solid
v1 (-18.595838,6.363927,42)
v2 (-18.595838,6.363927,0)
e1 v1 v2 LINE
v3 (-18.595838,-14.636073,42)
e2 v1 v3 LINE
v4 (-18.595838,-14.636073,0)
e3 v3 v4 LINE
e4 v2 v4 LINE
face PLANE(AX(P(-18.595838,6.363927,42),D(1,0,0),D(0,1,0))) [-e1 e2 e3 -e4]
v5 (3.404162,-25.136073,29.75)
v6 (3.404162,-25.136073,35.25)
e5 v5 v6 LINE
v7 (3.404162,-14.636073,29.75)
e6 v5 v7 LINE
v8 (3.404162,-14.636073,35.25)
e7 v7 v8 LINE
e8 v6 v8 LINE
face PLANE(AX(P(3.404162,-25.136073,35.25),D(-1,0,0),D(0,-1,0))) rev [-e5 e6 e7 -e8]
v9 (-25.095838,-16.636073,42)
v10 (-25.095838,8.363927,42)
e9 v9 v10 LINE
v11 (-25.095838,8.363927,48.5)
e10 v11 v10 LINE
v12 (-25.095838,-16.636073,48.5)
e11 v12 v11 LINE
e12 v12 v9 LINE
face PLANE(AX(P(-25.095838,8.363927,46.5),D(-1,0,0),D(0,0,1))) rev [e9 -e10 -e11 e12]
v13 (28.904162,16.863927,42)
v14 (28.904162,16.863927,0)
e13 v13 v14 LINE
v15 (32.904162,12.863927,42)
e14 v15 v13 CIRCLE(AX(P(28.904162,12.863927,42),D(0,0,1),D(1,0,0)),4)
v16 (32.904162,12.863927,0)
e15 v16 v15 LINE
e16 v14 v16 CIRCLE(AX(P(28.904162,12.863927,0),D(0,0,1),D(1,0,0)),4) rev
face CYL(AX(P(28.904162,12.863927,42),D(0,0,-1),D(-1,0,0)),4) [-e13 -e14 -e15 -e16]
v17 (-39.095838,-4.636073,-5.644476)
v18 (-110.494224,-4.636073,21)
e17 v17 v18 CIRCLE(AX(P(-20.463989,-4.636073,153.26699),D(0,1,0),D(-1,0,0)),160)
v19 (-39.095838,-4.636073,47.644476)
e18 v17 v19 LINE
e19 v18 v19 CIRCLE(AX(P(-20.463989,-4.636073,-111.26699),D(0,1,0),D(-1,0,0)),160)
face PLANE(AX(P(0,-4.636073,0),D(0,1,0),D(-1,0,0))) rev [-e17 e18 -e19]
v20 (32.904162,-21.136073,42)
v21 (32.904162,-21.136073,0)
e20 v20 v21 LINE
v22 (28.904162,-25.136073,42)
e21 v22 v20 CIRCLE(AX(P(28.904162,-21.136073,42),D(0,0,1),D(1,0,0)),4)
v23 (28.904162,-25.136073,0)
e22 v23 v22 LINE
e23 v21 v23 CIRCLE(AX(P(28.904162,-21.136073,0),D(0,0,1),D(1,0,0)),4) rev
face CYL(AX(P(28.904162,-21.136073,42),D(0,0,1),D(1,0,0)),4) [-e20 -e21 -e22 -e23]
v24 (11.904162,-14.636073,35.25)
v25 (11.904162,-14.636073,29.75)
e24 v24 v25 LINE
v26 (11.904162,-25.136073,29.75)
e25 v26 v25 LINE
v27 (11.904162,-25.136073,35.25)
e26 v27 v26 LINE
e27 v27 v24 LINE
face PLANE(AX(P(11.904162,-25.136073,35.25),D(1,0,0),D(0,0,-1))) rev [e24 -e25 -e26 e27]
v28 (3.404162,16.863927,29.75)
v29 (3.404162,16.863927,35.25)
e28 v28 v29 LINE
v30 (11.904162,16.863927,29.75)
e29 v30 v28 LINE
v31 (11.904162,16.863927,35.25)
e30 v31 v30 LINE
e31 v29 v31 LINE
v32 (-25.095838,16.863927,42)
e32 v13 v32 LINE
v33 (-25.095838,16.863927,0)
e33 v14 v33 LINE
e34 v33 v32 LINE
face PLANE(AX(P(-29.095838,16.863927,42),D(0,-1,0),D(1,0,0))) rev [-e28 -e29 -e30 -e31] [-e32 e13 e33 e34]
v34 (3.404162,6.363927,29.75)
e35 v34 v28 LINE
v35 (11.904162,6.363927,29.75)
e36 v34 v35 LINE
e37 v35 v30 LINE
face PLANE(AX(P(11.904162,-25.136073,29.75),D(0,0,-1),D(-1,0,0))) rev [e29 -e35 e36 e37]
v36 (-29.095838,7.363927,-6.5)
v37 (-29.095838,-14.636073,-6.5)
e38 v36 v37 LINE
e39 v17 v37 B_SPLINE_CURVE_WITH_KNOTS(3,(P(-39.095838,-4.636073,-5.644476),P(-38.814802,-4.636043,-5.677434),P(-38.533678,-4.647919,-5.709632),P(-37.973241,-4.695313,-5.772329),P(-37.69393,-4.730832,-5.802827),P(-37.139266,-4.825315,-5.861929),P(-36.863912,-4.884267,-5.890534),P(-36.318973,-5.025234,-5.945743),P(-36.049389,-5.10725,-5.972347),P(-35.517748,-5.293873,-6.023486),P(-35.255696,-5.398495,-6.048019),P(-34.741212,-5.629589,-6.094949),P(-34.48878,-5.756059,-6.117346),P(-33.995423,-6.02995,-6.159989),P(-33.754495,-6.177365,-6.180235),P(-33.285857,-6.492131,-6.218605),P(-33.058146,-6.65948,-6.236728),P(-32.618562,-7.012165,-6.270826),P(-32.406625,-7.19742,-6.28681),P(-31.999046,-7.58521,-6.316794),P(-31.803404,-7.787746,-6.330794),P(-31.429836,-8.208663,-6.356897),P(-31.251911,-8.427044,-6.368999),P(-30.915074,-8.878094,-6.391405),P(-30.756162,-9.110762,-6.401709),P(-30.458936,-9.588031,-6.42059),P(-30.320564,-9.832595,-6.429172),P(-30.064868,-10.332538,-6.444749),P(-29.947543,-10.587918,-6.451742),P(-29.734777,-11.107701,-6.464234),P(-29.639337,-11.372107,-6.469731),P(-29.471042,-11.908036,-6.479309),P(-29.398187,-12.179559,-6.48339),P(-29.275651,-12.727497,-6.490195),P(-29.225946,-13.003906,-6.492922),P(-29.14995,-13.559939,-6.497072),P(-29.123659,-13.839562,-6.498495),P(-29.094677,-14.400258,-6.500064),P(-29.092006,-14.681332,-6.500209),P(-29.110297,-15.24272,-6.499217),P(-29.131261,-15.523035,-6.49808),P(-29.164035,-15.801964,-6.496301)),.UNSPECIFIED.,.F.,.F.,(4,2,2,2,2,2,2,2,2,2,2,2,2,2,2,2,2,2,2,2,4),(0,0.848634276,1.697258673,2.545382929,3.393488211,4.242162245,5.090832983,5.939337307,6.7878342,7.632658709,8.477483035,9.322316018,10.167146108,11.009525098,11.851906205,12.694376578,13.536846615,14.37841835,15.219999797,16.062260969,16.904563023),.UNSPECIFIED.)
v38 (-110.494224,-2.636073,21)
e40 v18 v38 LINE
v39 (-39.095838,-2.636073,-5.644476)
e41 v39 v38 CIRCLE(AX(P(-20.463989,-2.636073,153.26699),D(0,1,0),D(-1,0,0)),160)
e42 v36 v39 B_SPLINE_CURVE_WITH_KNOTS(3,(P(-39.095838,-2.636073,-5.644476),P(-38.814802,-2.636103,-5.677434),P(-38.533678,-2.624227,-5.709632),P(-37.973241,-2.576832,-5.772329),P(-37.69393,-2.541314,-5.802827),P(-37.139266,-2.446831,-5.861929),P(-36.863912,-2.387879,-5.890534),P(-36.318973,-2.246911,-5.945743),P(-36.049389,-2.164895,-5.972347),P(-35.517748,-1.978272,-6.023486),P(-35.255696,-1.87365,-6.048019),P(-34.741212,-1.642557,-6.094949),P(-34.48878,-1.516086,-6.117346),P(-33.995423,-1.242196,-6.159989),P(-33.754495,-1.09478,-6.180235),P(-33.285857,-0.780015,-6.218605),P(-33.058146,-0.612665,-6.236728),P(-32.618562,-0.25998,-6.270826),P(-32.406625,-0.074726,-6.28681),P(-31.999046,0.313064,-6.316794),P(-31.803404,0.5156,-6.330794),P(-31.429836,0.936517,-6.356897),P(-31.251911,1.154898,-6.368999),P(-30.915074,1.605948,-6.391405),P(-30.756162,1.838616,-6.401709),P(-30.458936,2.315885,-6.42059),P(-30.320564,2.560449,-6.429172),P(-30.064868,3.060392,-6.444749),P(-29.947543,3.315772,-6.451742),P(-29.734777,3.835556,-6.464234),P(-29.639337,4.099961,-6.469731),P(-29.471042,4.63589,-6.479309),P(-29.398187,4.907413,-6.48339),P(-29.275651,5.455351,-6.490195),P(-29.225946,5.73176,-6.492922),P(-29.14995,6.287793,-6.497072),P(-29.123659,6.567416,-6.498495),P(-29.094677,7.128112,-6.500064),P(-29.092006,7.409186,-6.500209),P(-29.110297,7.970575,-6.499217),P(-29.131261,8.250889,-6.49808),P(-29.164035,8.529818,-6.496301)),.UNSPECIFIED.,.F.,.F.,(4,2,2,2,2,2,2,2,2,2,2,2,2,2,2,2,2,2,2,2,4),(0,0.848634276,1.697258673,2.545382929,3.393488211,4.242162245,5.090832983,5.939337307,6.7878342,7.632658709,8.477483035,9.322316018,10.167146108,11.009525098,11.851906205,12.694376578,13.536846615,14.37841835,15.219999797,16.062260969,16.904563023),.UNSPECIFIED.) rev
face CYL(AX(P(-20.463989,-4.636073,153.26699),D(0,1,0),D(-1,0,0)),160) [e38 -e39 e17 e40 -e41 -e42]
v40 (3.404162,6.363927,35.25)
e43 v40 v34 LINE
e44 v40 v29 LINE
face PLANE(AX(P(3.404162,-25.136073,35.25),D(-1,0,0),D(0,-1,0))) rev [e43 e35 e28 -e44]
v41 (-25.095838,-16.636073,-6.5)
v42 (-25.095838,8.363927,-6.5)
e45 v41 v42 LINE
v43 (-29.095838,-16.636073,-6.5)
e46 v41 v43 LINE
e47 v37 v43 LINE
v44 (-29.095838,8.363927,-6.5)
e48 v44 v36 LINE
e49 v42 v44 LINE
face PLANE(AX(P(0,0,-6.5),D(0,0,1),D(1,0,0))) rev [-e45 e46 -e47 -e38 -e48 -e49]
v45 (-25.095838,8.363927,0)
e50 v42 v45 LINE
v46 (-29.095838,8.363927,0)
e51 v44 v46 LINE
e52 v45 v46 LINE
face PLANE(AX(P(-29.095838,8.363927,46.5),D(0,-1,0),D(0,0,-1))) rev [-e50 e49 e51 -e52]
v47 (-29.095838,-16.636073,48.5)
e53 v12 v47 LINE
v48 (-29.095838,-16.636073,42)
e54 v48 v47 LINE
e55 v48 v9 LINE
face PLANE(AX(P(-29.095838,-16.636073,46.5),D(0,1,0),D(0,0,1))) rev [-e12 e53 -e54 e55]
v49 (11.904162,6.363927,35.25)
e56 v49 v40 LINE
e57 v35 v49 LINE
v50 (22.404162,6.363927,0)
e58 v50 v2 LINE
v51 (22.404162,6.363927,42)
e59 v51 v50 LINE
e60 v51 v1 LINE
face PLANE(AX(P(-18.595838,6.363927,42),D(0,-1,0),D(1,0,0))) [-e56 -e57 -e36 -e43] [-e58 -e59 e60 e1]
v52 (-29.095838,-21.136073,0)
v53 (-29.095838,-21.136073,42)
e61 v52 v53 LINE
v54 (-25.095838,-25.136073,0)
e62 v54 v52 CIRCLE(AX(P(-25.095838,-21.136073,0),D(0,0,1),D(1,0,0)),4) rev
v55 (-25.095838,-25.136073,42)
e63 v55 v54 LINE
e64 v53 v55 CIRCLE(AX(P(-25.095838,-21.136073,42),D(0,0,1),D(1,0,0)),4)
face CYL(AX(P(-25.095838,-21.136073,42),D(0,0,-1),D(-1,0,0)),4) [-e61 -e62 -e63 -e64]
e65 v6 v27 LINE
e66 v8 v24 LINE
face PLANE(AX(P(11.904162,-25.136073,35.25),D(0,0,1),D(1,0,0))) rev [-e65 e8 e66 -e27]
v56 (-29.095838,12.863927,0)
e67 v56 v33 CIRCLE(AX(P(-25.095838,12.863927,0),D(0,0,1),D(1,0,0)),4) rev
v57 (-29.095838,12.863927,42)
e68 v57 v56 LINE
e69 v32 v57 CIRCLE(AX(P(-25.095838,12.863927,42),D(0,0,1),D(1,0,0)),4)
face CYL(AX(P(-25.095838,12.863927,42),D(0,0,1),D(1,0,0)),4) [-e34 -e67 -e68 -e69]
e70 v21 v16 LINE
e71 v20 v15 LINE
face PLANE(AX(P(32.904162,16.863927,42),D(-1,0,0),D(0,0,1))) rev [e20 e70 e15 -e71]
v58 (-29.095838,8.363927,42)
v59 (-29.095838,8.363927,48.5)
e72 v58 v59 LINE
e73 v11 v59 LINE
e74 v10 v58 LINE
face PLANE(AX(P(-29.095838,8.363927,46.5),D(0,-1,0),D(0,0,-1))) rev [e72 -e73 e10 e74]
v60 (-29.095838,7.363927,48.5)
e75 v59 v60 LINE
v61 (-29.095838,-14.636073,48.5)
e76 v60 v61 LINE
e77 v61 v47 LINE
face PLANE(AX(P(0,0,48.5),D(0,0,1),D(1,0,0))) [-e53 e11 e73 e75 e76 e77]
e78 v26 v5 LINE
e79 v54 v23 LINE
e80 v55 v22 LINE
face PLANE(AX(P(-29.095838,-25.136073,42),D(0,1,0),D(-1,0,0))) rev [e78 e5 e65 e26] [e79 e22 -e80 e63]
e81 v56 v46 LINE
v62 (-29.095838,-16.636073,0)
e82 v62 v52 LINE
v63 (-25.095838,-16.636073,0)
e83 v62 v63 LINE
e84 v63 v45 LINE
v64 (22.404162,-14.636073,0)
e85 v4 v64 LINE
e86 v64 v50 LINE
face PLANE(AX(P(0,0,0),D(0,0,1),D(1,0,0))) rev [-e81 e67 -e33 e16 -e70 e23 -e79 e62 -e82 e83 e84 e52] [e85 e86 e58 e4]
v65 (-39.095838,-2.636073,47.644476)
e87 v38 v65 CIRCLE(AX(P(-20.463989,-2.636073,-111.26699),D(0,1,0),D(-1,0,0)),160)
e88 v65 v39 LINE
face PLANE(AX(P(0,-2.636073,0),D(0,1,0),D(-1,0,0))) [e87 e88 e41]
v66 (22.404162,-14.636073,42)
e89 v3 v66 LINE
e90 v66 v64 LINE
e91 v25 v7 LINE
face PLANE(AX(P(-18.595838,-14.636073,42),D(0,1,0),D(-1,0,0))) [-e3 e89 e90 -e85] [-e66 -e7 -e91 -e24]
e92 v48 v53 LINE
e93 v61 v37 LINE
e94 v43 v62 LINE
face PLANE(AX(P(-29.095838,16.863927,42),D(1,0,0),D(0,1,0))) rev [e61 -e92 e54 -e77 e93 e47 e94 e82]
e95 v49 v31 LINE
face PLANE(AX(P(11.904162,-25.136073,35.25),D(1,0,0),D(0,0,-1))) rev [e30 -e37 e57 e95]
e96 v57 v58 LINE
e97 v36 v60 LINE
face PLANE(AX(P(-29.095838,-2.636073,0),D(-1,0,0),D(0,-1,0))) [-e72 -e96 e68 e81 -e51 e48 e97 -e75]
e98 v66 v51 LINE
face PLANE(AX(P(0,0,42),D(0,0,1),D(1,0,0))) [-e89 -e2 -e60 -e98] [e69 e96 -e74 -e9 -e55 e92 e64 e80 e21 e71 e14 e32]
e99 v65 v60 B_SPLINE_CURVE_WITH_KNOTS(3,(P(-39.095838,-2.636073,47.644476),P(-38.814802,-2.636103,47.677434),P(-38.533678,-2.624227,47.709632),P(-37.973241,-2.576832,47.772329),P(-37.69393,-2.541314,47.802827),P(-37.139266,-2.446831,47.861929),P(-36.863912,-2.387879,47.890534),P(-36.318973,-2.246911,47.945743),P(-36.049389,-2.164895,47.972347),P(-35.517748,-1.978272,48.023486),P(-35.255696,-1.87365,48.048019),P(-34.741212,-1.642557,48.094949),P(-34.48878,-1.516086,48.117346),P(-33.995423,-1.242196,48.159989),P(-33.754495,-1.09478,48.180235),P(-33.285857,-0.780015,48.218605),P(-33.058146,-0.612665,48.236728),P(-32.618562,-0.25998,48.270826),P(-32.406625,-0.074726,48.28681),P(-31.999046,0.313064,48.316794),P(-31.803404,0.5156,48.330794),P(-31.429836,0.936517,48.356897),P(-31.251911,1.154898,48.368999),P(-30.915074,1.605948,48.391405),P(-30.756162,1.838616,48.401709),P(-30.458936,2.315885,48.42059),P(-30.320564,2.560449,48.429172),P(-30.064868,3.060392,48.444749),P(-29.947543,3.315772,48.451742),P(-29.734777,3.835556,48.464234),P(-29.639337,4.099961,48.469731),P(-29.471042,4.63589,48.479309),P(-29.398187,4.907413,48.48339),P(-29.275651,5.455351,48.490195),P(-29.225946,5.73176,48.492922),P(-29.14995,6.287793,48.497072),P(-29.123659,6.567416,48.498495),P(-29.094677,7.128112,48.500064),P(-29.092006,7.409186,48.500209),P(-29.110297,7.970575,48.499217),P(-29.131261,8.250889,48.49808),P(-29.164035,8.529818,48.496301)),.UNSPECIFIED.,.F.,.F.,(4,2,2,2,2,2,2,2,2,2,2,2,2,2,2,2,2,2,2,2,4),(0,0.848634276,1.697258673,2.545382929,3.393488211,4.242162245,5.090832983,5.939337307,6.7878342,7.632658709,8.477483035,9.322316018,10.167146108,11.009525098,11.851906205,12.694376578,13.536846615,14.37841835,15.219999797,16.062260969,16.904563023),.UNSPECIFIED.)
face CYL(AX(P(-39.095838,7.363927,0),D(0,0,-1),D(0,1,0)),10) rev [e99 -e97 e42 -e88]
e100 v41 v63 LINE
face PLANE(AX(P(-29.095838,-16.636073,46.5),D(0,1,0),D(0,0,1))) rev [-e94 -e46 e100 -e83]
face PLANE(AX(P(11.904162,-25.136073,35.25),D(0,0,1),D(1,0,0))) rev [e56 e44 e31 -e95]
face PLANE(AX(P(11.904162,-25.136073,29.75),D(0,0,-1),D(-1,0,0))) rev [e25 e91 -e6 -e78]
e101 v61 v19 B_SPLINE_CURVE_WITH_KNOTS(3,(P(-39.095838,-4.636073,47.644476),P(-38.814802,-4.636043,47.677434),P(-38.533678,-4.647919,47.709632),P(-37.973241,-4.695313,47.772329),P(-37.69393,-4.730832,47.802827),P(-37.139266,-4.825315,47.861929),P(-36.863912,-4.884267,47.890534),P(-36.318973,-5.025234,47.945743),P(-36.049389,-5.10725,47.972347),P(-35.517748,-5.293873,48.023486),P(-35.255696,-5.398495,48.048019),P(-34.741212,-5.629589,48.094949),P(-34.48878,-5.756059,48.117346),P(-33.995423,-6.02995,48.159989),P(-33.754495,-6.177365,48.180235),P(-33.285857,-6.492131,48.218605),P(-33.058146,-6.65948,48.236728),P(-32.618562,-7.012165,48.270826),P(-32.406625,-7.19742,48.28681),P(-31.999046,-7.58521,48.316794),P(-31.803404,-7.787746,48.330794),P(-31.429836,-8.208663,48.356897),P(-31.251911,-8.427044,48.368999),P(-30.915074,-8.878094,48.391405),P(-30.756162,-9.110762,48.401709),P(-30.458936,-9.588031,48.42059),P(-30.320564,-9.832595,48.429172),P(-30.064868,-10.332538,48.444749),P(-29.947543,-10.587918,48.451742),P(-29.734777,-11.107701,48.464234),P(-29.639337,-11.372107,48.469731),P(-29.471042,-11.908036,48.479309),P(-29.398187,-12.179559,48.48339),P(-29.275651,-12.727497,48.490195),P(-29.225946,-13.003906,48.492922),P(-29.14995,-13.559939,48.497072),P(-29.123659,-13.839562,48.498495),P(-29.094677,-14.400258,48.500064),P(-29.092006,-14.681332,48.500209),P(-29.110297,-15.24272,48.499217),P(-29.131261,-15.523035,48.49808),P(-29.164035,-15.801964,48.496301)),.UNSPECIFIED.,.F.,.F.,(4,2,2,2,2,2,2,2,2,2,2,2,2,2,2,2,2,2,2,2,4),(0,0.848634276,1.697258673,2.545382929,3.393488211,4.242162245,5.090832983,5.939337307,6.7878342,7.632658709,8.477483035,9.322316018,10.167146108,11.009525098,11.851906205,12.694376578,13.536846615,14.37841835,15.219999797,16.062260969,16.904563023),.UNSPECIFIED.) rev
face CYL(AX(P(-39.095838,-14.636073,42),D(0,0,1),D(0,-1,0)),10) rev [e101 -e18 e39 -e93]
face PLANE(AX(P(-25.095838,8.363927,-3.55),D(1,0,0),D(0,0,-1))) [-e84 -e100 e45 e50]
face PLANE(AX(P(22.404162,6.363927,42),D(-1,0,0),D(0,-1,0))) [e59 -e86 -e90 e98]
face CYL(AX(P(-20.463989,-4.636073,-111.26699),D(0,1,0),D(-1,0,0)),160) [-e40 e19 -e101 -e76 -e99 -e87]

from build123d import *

# Parameters (mm, degrees)
SKETCH1_W           = 62
SKETCH1_H           = 42
SKETCH1_W_2         = 41
SKETCH1_H_2         = 21
BOSS_EXTRUDE1_DEPTH = 42
SKETCH2_W           = 4
SKETCH2_H           = 25
BOSS_EXTRUDE2_DEPTH = 4.5
SKETCH2_2_W         = 4
SKETCH2_2_H         = 25
BOSS_EXTRUDE3_DEPTH = 45.55
SKETCH3_W           = 4
SKETCH3_H           = 25
BOSS_EXTRUDE6_DEPTH = 2
BOSS_EXTRUDE7_START = -53
SKETCH3_8_W         = 4
SKETCH3_8_H         = 25
BOSS_EXTRUDE7_DEPTH = 53
CUT_EXTRUDE1_START  = -51
CUT_EXTRUDE1_DEPTH  = 51
SKETCH_1_W          = 8.5
SKETCH_1_H          = 5.5
CUT_EXTRUDE_1_DEPTH = 42
FILLET_3_R          = 4
FILLET_4_R          = 4
FILLET_5_R          = 4
FILLET_6_R          = 4
CUT_EXTRUDE3_DEPTH  = 55
BOSS_EXTRUDE8_DEPTH = 21.5
CUT_EXTRUDE4_DEPTH  = 19.5
FILLET_START        = -14.636072995
FILLET_7_DEPTH      = 10.0000001
FILLET_START_2      = -8
FILLET_7_2_DEPTH    = 57
FILLET_8_R          = 10


with BuildPart() as part:
    # Sketch1 → Boss-Extrude1 (new body)
    with BuildSketch(Plane.XY):
        with Locations((1.904162196, -4.136072895)):
            Rectangle(SKETCH1_W, SKETCH1_H)
        with Locations((1.904162196, -4.136072895)):
            Rectangle(SKETCH1_W_2, SKETCH1_H_2, mode=Mode.SUBTRACT)
    extrude(amount=BOSS_EXTRUDE1_DEPTH)

    # Sketch2 → Boss-Extrude2 (add)
    with BuildSketch(Plane.XY.offset(42)):
        with Locations((-27.095837804, -4.136072895)):
            Rectangle(SKETCH2_W, SKETCH2_H)
    extrude(amount=BOSS_EXTRUDE2_DEPTH)

    # Sketch2<2> → Boss-Extrude3 (add)
    with BuildSketch(Plane.XY.offset(42)):
        with Locations((-27.095837804, -4.136072895)):
            Rectangle(SKETCH2_2_W, SKETCH2_2_H)
    extrude(amount=-BOSS_EXTRUDE3_DEPTH)

    # Sketch3 → Boss-Extrude6 (add)
    # profile 1 of 3: a face of its own
    with BuildSketch(Plane.XY.offset(46.5)):
        with BuildLine():
            Line((-60.095837804, 4.463927105), (-60.095837804, 8.363927105))
            ThreePointArc((-60.095837804, 8.363927105), (-72.595837804, -4.136072895), (-60.095837804, -16.636072895))
            Line((-60.095837804, -16.636072895), (-60.095837804, -13.176248856))
            Line((-60.095837804, -13.176248856), (-60.555926168, -13.176248856))
            ThreePointArc((-60.555926168, -13.176248856), (-62.055926168, -11.676248856), (-60.555926168, -10.176248856))
            Line((-60.555926168, -10.176248856), (-60.095837804, -10.176248856))
            Line((-60.095837804, -10.176248856), (-60.095837804, -8.186072895))
            ThreePointArc((-60.095837804, -8.186072895), (-64.145837804, -4.136072895), (-60.095837804, -0.086072895))
            Line((-60.095837804, -0.086072895), (-60.095837804, 1.463927105))
            Line((-60.095837804, 1.463927105), (-60.595837804, 1.463927105))
            ThreePointArc((-60.595837804, 1.463927105), (-62.095837804, 2.963927105), (-60.595837804, 4.463927105))
            Line((-60.595837804, 4.463927105), (-60.095837804, 4.463927105))
        make_face()
        with BuildLine():
            ThreePointArc((-68.695837804, -3.636072895), (-67.195837804, -2.136072895), (-65.695837804, -3.636072895))
            Line((-65.695837804, -3.636072895), (-65.695837804, -4.636072895))
            ThreePointArc((-65.695837804, -4.636072895), (-67.195837804, -6.136072895), (-68.695837804, -4.636072895))
            Line((-68.695837804, -4.636072895), (-68.695837804, -3.636072895))
        make_face(mode=Mode.SUBTRACT)
    # profile 2 of 3: a face of its own
    with BuildSketch(Plane.XY.offset(46.5)):
        with BuildLine():
            Line((-29.095837804, -16.636072895), (-29.095837804, 8.363927105))
            Line((-29.095837804, 8.363927105), (-60.095837804, 8.363927105))
            Line((-60.095837804, 8.363927105), (-60.095837804, 4.463927105))
            Line((-60.095837804, 4.463927105), (-59.595837804, 4.463927105))
            ThreePointArc((-59.595837804, 4.463927105), (-58.095837804, 2.963927105), (-59.595837804, 1.463927105))
            Line((-59.595837804, 1.463927105), (-60.095837804, 1.463927105))
            Line((-60.095837804, 1.463927105), (-60.095837804, -0.086072895))
            ThreePointArc((-60.095837804, -0.086072895), (-57.23205534, -1.272290432), (-56.045837804, -4.136072895))
            ThreePointArc((-56.045837804, -4.136072895), (-57.23205534, -6.999855359), (-60.095837804, -8.186072895))
            Line((-60.095837804, -8.186072895), (-60.095837804, -10.176248856))
            Line((-60.095837804, -10.176248856), (-59.635749439, -10.176248856))
            ThreePointArc((-59.635749439, -10.176248856), (-58.135749439, -11.676248856), (-59.635749439, -13.176248856))
            Line((-59.635749439, -13.176248856), (-60.095837804, -13.176248856))
            Line((-60.095837804, -13.176248856), (-60.095837804, -16.636072895))
            Line((-60.095837804, -16.636072895), (-29.095837804, -16.636072895))
        make_face()
        with BuildLine():
            ThreePointArc((-54.495837804, -3.636072895), (-52.995837804, -2.136072895), (-51.495837804, -3.636072895))
            Line((-51.495837804, -3.636072895), (-51.495837804, -4.636072895))
            ThreePointArc((-51.495837804, -4.636072895), (-52.995837804, -6.136072895), (-54.495837804, -4.636072895))
            Line((-54.495837804, -4.636072895), (-54.495837804, -3.636072895))
        make_face(mode=Mode.SUBTRACT)
    # profile 3 of 3: a face of its own
    with BuildSketch(Plane.XY.offset(46.5)):
        with Locations((-27.095837804, -4.136072895)):
            Rectangle(SKETCH3_W, SKETCH3_H)
    extrude(amount=BOSS_EXTRUDE6_DEPTH)

    # Sketch3<8> → Boss-Extrude7 (add)
    # profile 1 of 3: a face of its own
    with BuildSketch(Plane.XY.offset(46.5).offset(BOSS_EXTRUDE7_START)):
        with BuildLine():
            Line((-60.095837804, 4.463927105), (-60.095837804, 8.363927105))
            ThreePointArc((-60.095837804, 8.363927105), (-72.595837804, -4.136072895), (-60.095837804, -16.636072895))
            Line((-60.095837804, -16.636072895), (-60.095837804, -13.176248856))
            Line((-60.095837804, -13.176248856), (-60.555926168, -13.176248856))
            ThreePointArc((-60.555926168, -13.176248856), (-62.055926168, -11.676248856), (-60.555926168, -10.176248856))
            Line((-60.555926168, -10.176248856), (-60.095837804, -10.176248856))
            Line((-60.095837804, -10.176248856), (-60.095837804, -8.186072895))
            ThreePointArc((-60.095837804, -8.186072895), (-64.145837804, -4.136072895), (-60.095837804, -0.086072895))
            Line((-60.095837804, -0.086072895), (-60.095837804, 1.463927105))
            Line((-60.095837804, 1.463927105), (-60.595837804, 1.463927105))
            ThreePointArc((-60.595837804, 1.463927105), (-62.095837804, 2.963927105), (-60.595837804, 4.463927105))
            Line((-60.595837804, 4.463927105), (-60.095837804, 4.463927105))
        make_face()
        with BuildLine():
            ThreePointArc((-68.695837804, -3.636072895), (-67.195837804, -2.136072895), (-65.695837804, -3.636072895))
            Line((-65.695837804, -3.636072895), (-65.695837804, -4.636072895))
            ThreePointArc((-65.695837804, -4.636072895), (-67.195837804, -6.136072895), (-68.695837804, -4.636072895))
            Line((-68.695837804, -4.636072895), (-68.695837804, -3.636072895))
        make_face(mode=Mode.SUBTRACT)
    # profile 2 of 3: a face of its own
    with BuildSketch(Plane.XY.offset(46.5).offset(BOSS_EXTRUDE7_START)):
        with BuildLine():
            Line((-29.095837804, -16.636072895), (-29.095837804, 8.363927105))
            Line((-29.095837804, 8.363927105), (-60.095837804, 8.363927105))
            Line((-60.095837804, 8.363927105), (-60.095837804, 4.463927105))
            Line((-60.095837804, 4.463927105), (-59.595837804, 4.463927105))
            ThreePointArc((-59.595837804, 4.463927105), (-58.095837804, 2.963927105), (-59.595837804, 1.463927105))
            Line((-59.595837804, 1.463927105), (-60.095837804, 1.463927105))
            Line((-60.095837804, 1.463927105), (-60.095837804, -0.086072895))
            ThreePointArc((-60.095837804, -0.086072895), (-57.23205534, -1.272290432), (-56.045837804, -4.136072895))
            ThreePointArc((-56.045837804, -4.136072895), (-57.23205534, -6.999855359), (-60.095837804, -8.186072895))
            Line((-60.095837804, -8.186072895), (-60.095837804, -10.176248856))
            Line((-60.095837804, -10.176248856), (-59.635749439, -10.176248856))
            ThreePointArc((-59.635749439, -10.176248856), (-58.135749439, -11.676248856), (-59.635749439, -13.176248856))
            Line((-59.635749439, -13.176248856), (-60.095837804, -13.176248856))
            Line((-60.095837804, -13.176248856), (-60.095837804, -16.636072895))
            Line((-60.095837804, -16.636072895), (-29.095837804, -16.636072895))
        make_face()
        with BuildLine():
            ThreePointArc((-54.495837804, -3.636072895), (-52.995837804, -2.136072895), (-51.495837804, -3.636072895))
            Line((-51.495837804, -3.636072895), (-51.495837804, -4.636072895))
            ThreePointArc((-51.495837804, -4.636072895), (-52.995837804, -6.136072895), (-54.495837804, -4.636072895))
            Line((-54.495837804, -4.636072895), (-54.495837804, -3.636072895))
        make_face(mode=Mode.SUBTRACT)
    # profile 3 of 3: a face of its own
    with BuildSketch(Plane.XY.offset(46.5).offset(BOSS_EXTRUDE7_START)):
        with Locations((-27.095837804, -4.136072895)):
            Rectangle(SKETCH3_8_W, SKETCH3_8_H)
    extrude(amount=BOSS_EXTRUDE7_DEPTH)

    # Sketch3<11> → Cut-Extrude1 (cut)
    # profile 1 of 2: a face of its own
    with BuildSketch(Plane.XY.offset(46.5).offset(CUT_EXTRUDE1_START)):
        with BuildLine():
            Line((-29.095837804, -16.636072895), (-29.095837804, 8.363927105))
            Line((-29.095837804, 8.363927105), (-60.095837804, 8.363927105))
            Line((-60.095837804, 8.363927105), (-60.095837804, 4.463927105))
            Line((-60.095837804, 4.463927105), (-59.595837804, 4.463927105))
            ThreePointArc((-59.595837804, 4.463927105), (-58.095837804, 2.963927105), (-59.595837804, 1.463927105))
            Line((-59.595837804, 1.463927105), (-60.095837804, 1.463927105))
            Line((-60.095837804, 1.463927105), (-60.095837804, -0.086072895))
            ThreePointArc((-60.095837804, -0.086072895), (-57.23205534, -1.272290432), (-56.045837804, -4.136072895))
            ThreePointArc((-56.045837804, -4.136072895), (-57.23205534, -6.999855359), (-60.095837804, -8.186072895))
            Line((-60.095837804, -8.186072895), (-60.095837804, -10.176248856))
            Line((-60.095837804, -10.176248856), (-59.635749439, -10.176248856))
            ThreePointArc((-59.635749439, -10.176248856), (-58.135749439, -11.676248856), (-59.635749439, -13.176248856))
            Line((-59.635749439, -13.176248856), (-60.095837804, -13.176248856))
            Line((-60.095837804, -13.176248856), (-60.095837804, -16.636072895))
            Line((-60.095837804, -16.636072895), (-29.095837804, -16.636072895))
        make_face()
        with BuildLine():
            ThreePointArc((-54.495837804, -3.636072895), (-52.995837804, -2.136072895), (-51.495837804, -3.636072895))
            Line((-51.495837804, -3.636072895), (-51.495837804, -4.636072895))
            ThreePointArc((-51.495837804, -4.636072895), (-52.995837804, -6.136072895), (-54.495837804, -4.636072895))
            Line((-54.495837804, -4.636072895), (-54.495837804, -3.636072895))
        make_face(mode=Mode.SUBTRACT)
    # profile 2 of 2: a face of its own
    with BuildSketch(Plane.XY.offset(46.5).offset(CUT_EXTRUDE1_START)):
        with BuildLine():
            Line((-60.095837804, 4.463927105), (-60.095837804, 8.363927105))
            ThreePointArc((-60.095837804, 8.363927105), (-72.595837804, -4.136072895), (-60.095837804, -16.636072895))
            Line((-60.095837804, -16.636072895), (-60.095837804, -13.176248856))
            Line((-60.095837804, -13.176248856), (-60.555926168, -13.176248856))
            ThreePointArc((-60.555926168, -13.176248856), (-62.055926168, -11.676248856), (-60.555926168, -10.176248856))
            Line((-60.555926168, -10.176248856), (-60.095837804, -10.176248856))
            Line((-60.095837804, -10.176248856), (-60.095837804, -8.186072895))
            ThreePointArc((-60.095837804, -8.186072895), (-64.145837804, -4.136072895), (-60.095837804, -0.086072895))
            Line((-60.095837804, -0.086072895), (-60.095837804, 1.463927105))
            Line((-60.095837804, 1.463927105), (-60.595837804, 1.463927105))
            ThreePointArc((-60.595837804, 1.463927105), (-62.095837804, 2.963927105), (-60.595837804, 4.463927105))
            Line((-60.595837804, 4.463927105), (-60.095837804, 4.463927105))
        make_face()
        with BuildLine():
            ThreePointArc((-68.695837804, -3.636072895), (-67.195837804, -2.136072895), (-65.695837804, -3.636072895))
            Line((-65.695837804, -3.636072895), (-65.695837804, -4.636072895))
            ThreePointArc((-65.695837804, -4.636072895), (-67.195837804, -6.136072895), (-68.695837804, -4.636072895))
            Line((-68.695837804, -4.636072895), (-68.695837804, -3.636072895))
        make_face(mode=Mode.SUBTRACT)
    extrude(amount=CUT_EXTRUDE1_DEPTH, mode=Mode.SUBTRACT)

    # 草圖1 → 除料-伸長1 (cut)
    with BuildSketch(Plane(origin=(0, 16.863927105, 0), x_dir=(1, 0, 0), z_dir=(0, 1, 0))):
        with Locations((7.654162196, -32.5)):
            Rectangle(SKETCH_1_W, SKETCH_1_H)
    extrude(amount=-CUT_EXTRUDE_1_DEPTH, mode=Mode.SUBTRACT)

    # 圓角3
    fillet_3_edges = [part.edges().sort_by_distance(p)[0] for p in [
        (-29.095837804, 16.863927105, 21),
    ]]
    fillet(fillet_3_edges, radius=FILLET_3_R)

    # 圓角4
    fillet_4_edges = [part.edges().sort_by_distance(p)[0] for p in [
        (32.904162196, 16.863927105, 21),
    ]]
    fillet(fillet_4_edges, radius=FILLET_4_R)

    # 圓角5
    fillet_5_edges = [part.edges().sort_by_distance(p)[0] for p in [
        (32.904162196, -25.136072895, 21),
    ]]
    fillet(fillet_5_edges, radius=FILLET_5_R)

    # 圓角6
    fillet_6_edges = [part.edges().sort_by_distance(p)[0] for p in [
        (-29.095837804, -25.136072895, 21),
    ]]
    fillet(fillet_6_edges, radius=FILLET_6_R)

    # Sketch8 → Cut-Extrude3 (cut)
    with BuildSketch(Plane(origin=(0, 0, -6.5), x_dir=(-1, 0, 0), z_dir=(0, 0, -1))):
        Polygon((29.095837804, 8.363927105), (72.680638832, 8.363927105), (72.680638832, -16.742132378), (29.095837804, -16.636072895), align=None)
    extrude(amount=-CUT_EXTRUDE3_DEPTH, mode=Mode.SUBTRACT)

    # Sketch9 → Boss-Extrude8 (add)
    with BuildSketch(Plane(origin=(0, 16.863927105, 0), x_dir=(1, 0, 0), z_dir=(0, 1, 0))):
        with BuildLine():
            Line((-29.095837804, -21), (-29.095837804, 6.5))
            ThreePointArc((-29.095837804, 6.5), (-71.675454468, -1.684056641), (-110.494224033, -21))
            Line((-110.494224033, -21), (-29.095837804, -21))
        make_face()
        with BuildLine():
            Line((-29.095837804, -48.5), (-29.095837804, -21))
            Line((-29.095837804, -21), (-110.494224033, -21))
            ThreePointArc((-110.494224033, -21), (-71.675454468, -40.315943359), (-29.095837804, -48.5))
        make_face()
    extrude(amount=-BOSS_EXTRUDE8_DEPTH)

    # Sketch9<4> → Cut-Extrude4 (cut)
    with BuildSketch(Plane(origin=(0, 16.863927105, 0), x_dir=(1, 0, 0), z_dir=(0, 1, 0))):
        with BuildLine():
            Line((-29.095837804, -21), (-29.095837804, 6.5))
            ThreePointArc((-29.095837804, 6.5), (-71.675454468, -1.684056641), (-110.494224033, -21))
            Line((-110.494224033, -21), (-29.095837804, -21))
        make_face()
        with BuildLine():
            Line((-29.095837804, -48.5), (-29.095837804, -21))
            Line((-29.095837804, -21), (-110.494224033, -21))
            ThreePointArc((-110.494224033, -21), (-71.675454468, -40.315943359), (-29.095837804, -48.5))
        make_face()
    extrude(amount=-CUT_EXTRUDE4_DEPTH, mode=Mode.SUBTRACT)

    # 圓角7: read off the stored shape, not the designer's step
    # 圓角7 outline → 圓角7 (add)
    with BuildSketch(Plane(origin=(0, 0, 0), x_dir=(1, 0, 0), z_dir=(0, 1, 0)).offset(FILLET_START)):
        with BuildLine():
            ThreePointArc((-29.095837804, 6.5), (-71.675454468, -1.684056641), (-110.494224033, -21))
            ThreePointArc((-110.494224033, -21), (-71.675454468, -40.315943359), (-29.095837804, -48.5))
            Line((-29.095837804, -48.5), (-29.095837804, 6.5))
        make_face()
    extrude(amount=FILLET_7_DEPTH)

    # Fillet 7 2 outline → Fillet 7 2 (cut)
    with BuildSketch(Plane.XY.offset(FILLET_START_2)):
        with BuildLine():
            Line((-112, -14.636072995), (-29.095837804, -14.636072895))
            ThreePointArc((-29.095837804, -14.636072895), (-32.024769993, -7.565005084), (-39.095837804, -4.636072895))
            Line((-39.095837804, -4.636072895), (-112, -4.636072895))
            Line((-112, -4.636072895), (-112, -14.636072995))
        make_face()
    extrude(amount=FILLET_7_2_DEPTH, mode=Mode.SUBTRACT)

    # 圓角8
    # the kernel refuses this fillet: 10 mm, written as the material it adds along each edge
    with BuildSketch(Plane(origin=(-29.095837804, -2.636072895, 48.5), x_dir=(0, 1, 0), z_dir=(0, 0, -1))) as fillet_8_piece_1_section:
        with BuildLine():
            CenterArc((FILLET_8_R, -FILLET_8_R), FILLET_8_R, 90, 90)
            Line((0, -FILLET_8_R), (0, 0))
            Line((0, 0), (FILLET_8_R, 0))
        make_face()
    fillet_8_piece_1 = extrude(amount=55, mode=Mode.PRIVATE)
    fillet_8_piece_1 = fillet_8_piece_1 & Plane(origin=(-20.463988641, -2.636072895, 153.26699027), x_dir=(-0.053949057267824306, 0, -0.998543689189368), z_dir=(0, 1, 0)) * Cylinder(160, 150, mode=Mode.PRIVATE)
    fillet_8_piece_1 = fillet_8_piece_1 & Plane(origin=(-20.463988641, -2.636072895, -111.26699027), x_dir=(-0.5626889712033937, 0, 0.8266686891893671), z_dir=(0, 1, 0)) * Cylinder(160, 150, mode=Mode.PRIVATE)
    add(fillet_8_piece_1)


solid = part.part
